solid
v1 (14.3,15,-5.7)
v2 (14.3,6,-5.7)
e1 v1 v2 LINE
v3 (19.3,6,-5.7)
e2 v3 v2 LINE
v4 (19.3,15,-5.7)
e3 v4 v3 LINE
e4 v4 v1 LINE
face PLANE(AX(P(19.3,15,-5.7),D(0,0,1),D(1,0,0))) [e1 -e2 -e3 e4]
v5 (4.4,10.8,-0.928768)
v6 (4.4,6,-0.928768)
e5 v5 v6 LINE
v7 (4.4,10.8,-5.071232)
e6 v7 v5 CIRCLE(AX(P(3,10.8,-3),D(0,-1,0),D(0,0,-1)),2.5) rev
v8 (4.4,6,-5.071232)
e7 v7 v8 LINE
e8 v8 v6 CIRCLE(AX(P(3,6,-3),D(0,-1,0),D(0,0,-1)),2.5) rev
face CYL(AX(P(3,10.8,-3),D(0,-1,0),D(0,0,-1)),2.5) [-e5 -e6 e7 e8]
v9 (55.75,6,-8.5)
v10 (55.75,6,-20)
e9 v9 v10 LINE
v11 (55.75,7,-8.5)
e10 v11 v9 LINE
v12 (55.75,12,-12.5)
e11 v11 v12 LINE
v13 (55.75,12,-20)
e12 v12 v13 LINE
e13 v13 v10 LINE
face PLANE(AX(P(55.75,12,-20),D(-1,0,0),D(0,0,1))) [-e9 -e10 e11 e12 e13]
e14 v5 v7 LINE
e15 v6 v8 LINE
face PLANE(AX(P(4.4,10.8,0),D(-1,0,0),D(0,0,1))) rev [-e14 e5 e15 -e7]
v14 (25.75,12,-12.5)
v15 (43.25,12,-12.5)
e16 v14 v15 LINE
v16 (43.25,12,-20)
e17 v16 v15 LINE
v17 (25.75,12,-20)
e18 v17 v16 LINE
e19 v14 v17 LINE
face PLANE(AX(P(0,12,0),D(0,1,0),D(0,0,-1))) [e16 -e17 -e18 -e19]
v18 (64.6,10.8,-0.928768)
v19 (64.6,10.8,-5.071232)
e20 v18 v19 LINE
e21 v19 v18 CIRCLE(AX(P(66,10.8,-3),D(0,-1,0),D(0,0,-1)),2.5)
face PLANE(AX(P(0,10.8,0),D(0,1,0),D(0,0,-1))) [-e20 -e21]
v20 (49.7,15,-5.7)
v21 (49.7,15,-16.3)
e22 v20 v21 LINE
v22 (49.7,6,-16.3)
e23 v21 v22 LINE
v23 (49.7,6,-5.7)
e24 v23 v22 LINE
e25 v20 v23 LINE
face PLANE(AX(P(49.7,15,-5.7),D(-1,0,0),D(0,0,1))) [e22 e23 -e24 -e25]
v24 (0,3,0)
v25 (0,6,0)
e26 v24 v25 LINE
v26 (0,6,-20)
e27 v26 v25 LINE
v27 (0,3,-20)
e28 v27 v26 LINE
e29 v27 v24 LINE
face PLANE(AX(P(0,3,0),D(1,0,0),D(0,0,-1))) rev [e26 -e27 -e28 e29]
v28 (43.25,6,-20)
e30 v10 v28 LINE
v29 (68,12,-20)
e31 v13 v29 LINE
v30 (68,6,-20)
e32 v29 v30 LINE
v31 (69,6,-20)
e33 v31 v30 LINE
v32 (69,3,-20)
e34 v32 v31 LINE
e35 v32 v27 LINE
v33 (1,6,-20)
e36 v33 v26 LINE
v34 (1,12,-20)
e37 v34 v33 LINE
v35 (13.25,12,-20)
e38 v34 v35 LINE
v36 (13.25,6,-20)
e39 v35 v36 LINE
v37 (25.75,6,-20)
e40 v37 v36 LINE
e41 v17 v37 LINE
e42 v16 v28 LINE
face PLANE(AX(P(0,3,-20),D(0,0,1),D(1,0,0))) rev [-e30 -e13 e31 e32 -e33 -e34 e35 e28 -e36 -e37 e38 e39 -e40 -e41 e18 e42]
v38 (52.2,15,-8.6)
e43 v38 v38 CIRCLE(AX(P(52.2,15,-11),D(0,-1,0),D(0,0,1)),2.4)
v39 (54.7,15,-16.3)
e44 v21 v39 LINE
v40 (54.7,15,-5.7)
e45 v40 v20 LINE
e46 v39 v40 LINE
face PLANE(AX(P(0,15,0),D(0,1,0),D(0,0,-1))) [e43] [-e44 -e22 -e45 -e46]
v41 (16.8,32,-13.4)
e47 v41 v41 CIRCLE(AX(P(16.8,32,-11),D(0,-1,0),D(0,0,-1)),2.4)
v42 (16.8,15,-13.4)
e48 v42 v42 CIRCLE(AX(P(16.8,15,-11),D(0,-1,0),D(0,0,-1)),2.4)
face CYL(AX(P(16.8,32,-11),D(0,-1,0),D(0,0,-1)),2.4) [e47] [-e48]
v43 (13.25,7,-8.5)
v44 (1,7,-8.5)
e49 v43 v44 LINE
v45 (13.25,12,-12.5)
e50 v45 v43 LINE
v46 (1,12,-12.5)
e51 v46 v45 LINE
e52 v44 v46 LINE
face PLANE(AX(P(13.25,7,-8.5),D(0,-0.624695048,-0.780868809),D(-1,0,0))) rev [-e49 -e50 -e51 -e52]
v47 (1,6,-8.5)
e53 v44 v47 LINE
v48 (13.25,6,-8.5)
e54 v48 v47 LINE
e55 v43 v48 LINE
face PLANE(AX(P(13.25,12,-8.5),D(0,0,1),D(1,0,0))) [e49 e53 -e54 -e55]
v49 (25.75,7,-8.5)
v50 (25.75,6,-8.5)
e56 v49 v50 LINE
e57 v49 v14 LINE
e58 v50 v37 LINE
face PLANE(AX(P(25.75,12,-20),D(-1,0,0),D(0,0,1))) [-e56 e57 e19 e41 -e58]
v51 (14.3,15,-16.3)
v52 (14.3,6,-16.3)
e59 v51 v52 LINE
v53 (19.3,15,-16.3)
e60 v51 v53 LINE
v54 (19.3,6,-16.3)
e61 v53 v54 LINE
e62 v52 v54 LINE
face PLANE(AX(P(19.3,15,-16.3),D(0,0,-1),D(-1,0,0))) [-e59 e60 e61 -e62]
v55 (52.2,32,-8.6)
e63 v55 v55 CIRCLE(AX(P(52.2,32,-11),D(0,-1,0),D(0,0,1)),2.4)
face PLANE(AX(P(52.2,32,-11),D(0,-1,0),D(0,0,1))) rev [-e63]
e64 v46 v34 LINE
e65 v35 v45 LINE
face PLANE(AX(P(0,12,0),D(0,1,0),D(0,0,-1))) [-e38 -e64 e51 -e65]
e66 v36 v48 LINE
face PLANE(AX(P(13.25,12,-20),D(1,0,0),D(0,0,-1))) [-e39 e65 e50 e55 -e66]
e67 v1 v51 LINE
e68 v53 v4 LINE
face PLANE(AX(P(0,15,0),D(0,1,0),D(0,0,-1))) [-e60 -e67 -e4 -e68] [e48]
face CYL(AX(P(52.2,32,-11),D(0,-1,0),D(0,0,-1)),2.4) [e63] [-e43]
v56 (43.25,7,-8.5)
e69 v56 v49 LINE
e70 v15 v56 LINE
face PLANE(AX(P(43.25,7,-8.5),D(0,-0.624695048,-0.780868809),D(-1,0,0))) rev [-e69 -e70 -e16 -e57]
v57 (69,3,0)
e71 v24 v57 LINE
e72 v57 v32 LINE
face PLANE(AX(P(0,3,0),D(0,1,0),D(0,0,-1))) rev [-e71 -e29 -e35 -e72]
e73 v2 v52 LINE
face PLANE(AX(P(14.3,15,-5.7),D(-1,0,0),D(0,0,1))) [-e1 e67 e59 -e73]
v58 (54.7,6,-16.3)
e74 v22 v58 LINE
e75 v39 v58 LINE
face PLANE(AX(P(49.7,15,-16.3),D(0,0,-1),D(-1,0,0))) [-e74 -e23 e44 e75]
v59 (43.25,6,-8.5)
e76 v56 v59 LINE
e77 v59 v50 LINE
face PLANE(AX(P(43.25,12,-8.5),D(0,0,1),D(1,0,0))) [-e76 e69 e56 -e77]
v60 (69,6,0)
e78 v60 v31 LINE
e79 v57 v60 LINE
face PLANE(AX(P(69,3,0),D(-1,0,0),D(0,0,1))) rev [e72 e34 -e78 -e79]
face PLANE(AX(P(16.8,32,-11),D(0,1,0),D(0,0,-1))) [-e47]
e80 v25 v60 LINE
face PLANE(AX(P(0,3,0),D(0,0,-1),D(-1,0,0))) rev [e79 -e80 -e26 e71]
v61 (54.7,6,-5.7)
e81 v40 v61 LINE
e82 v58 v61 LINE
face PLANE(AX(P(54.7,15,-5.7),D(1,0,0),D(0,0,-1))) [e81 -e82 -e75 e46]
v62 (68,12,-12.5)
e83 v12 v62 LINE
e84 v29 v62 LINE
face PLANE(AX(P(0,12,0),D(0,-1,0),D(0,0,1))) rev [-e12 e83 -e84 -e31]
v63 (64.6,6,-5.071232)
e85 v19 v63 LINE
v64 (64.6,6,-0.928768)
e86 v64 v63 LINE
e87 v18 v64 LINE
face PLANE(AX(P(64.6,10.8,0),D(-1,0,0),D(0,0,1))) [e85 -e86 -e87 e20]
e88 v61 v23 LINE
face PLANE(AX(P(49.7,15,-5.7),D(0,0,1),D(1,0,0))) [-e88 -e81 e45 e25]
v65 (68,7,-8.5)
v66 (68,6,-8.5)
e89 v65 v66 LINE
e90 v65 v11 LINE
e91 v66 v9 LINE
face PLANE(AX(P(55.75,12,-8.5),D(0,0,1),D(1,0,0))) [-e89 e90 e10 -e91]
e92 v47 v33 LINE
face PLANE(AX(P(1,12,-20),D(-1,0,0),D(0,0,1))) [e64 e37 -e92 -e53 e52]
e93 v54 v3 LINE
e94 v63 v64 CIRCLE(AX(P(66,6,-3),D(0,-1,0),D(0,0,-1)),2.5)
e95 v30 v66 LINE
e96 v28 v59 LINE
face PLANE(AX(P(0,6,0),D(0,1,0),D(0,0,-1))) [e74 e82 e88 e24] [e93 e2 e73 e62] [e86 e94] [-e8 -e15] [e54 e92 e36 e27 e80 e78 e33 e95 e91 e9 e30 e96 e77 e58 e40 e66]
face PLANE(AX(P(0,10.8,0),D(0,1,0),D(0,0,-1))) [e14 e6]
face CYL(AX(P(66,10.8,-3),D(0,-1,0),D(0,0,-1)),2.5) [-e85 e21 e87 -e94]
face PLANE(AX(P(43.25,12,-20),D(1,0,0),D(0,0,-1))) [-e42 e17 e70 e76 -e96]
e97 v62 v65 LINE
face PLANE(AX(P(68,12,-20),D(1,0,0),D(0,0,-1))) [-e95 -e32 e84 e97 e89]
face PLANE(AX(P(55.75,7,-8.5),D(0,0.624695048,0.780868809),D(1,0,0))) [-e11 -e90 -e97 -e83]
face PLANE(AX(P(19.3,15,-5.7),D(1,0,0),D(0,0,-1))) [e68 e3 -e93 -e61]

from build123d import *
from OCP.BRepFilletAPI import BRepFilletAPI_MakeChamfer

# Parameters (mm, degrees)
SKETCH_1_W             = 69
SKETCH_1_H             = 20
EXTRUDE_1_DEPTH        = 3
FILLET_1_R             = 1
SKETCH_3_W             = 12.25
SKETCH_3_H             = 11.5
SKETCH_3_W_2           = 17.5
EXTRUDE_2_DEPTH        = 6
SKETCH_4_W             = 5
SKETCH_4_H             = 10.6
EXTRUDE_3_DEPTH        = 9
SKETCH_5_R             = 2.4
EXTRUDE_4_DEPTH        = 17
CHAMFER_1_SIZE         = 4
CHAMFER_1_SIZE2        = 5
EXTRUDE_5_DEPTH        = 4.8
MIRROR_START           = 3
MIRROR_1_OUTLINE_W     = 69
MIRROR_1_OUTLINE_H     = 20
MIRROR_1_DEPTH         = 3
MIRROR_START_2         = 6
MIRROR_1_2_OUTLINE_W   = 5
MIRROR_1_2_OUTLINE_H   = 10.6
MIRROR_1_2_DEPTH       = 9
MIRROR_START_3         = 15
MIRROR_1_3_OUTLINE_R   = 2.4
MIRROR_1_3_DEPTH       = 17
MIRROR_1_4_OUTLINE_W   = 12.25
MIRROR_1_4_OUTLINE_H   = 11.5
MIRROR_1_4_OUTLINE_W_2 = 17.5
MIRROR_1_4_DEPTH       = 1
MIRROR_START_4         = 6.49884
MIRROR_1_5_DEPTH       = 4.30116
MIRROR_START_5         = 25.75
MIRROR_1_6_DEPTH       = 17.5
MIRROR_START_6         = 1
MIRROR_1_7_DEPTH       = 12.25
MIRROR_START_7         = 55.75
MIRROR_1_8_DEPTH       = 12.25
SKETCH_7_W             = 69
SKETCH_7_H             = 20
CUT_EXTRUDE_1_DEPTH    = 78.472575793


with BuildPart() as part:
    # ｽｹｯﾁ1 → ﾎﾞｽ - 押し出し1 (new body)
    with BuildSketch(Plane(origin=(0, 0, 0), x_dir=(1, 0, 0), z_dir=(0, 1, 0))):
        with Locations((34.5, 10)):
            Rectangle(SKETCH_1_W, SKETCH_1_H)
    extrude(amount=EXTRUDE_1_DEPTH)

    # ﾌｨﾚｯﾄ1
    fillet_1_edges = [part.edges().sort_by_distance(p)[0] for p in [
        (0, 1.5, -20),
        (69, 1.5, -20),
        (69, 1.5, 0),
        (0, 1.5, 0),
    ]]
    fillet(fillet_1_edges, radius=FILLET_1_R)

    # ｽｹｯﾁ3 → ﾎﾞｽ - 押し出し2 (add)
    with BuildSketch(Plane.XZ):
        with Locations((7.125, -14.25)):
            Rectangle(SKETCH_3_W, SKETCH_3_H)
        with Locations((34.5, -14.25)):
            Rectangle(SKETCH_3_W_2, SKETCH_3_H)
        with Locations((61.875, -14.25)):
            Rectangle(SKETCH_3_W, SKETCH_3_H)
    extrude(amount=EXTRUDE_2_DEPTH)

    # ｽｹｯﾁ4 → ﾎﾞｽ - 押し出し3 (add)
    with BuildSketch(Plane.XZ):
        with Locations((52.2, -11)):
            Rectangle(SKETCH_4_W, SKETCH_4_H)
        with Locations((16.8, -11)):
            Rectangle(SKETCH_4_W, SKETCH_4_H)
    extrude(amount=EXTRUDE_3_DEPTH)

    # ｽｹｯﾁ5 → ﾎﾞｽ - 押し出し4 (add)
    with BuildSketch(Plane.XZ.offset(9)):
        with Locations(Location((16.8, -11, 0), (0, 0, 270))):
            Circle(SKETCH_5_R)
        with Locations(Location((52.2, -11, 0), (0, 0, 90))):
            Circle(SKETCH_5_R)
    extrude(amount=EXTRUDE_4_DEPTH)

    # 面取り1: one chamfer whose edges measure the first distance from different faces: ONE call of the kernel's chamfer builder (chamfer() names one face for all edges)
    chamfer_1_edges_1 = [part.edges().sort_by_distance(p)[0] for p in [
        (7.125, -6, -8.5),
    ]]
    chamfer_1_side_1 = [part.faces().sort_by_distance(p)[0] for p in [
        (7.125, -3, -8.5),
    ]]
    chamfer_1_edges_2 = [part.edges().sort_by_distance(p)[0] for p in [
        (34.5, -6, -8.5),
    ]]
    chamfer_1_side_2 = [part.faces().sort_by_distance(p)[0] for p in [
        (34.5, -3, -8.5),
    ]]
    chamfer_1_edges_3 = [part.edges().sort_by_distance(p)[0] for p in [
        (61.875, -6, -8.5),
    ]]
    chamfer_1_side_3 = [part.faces().sort_by_distance(p)[0] for p in [
        (61.875, -3, -8.5),
    ]]
    chamfer_1 = BRepFilletAPI_MakeChamfer(part.part.solid().wrapped)
    for e in chamfer_1_edges_1:
        chamfer_1.Add(CHAMFER_1_SIZE, CHAMFER_1_SIZE2, e.wrapped, chamfer_1_side_1[0].wrapped)  # the first distance lies on this face
    for e in chamfer_1_edges_2:
        chamfer_1.Add(CHAMFER_1_SIZE, CHAMFER_1_SIZE2, e.wrapped, chamfer_1_side_2[0].wrapped)  # the first distance lies on this face
    for e in chamfer_1_edges_3:
        chamfer_1.Add(CHAMFER_1_SIZE, CHAMFER_1_SIZE2, e.wrapped, chamfer_1_side_3[0].wrapped)  # the first distance lies on this face
    add(Compound.cast(chamfer_1.Shape()), mode=Mode.REPLACE)

    # ｽｹｯﾁ6 → ﾎﾞｽ - 押し出し5 (add)
    with BuildSketch(Plane.XZ):
        with BuildLine():
            Line((4.4, -5.071231518), (4.4, -0.928768482))
            ThreePointArc((4.4, -0.928768482), (0.5, -3), (4.4, -5.071231518))
        make_face()
        with BuildLine():
            ThreePointArc((68.5, -3), (67.17260394, -0.792059783), (64.6, -0.928768482))
            Line((64.6, -0.928768482), (64.6, -5.071231518))
            ThreePointArc((64.6, -5.071231518), (67.17260394, -5.207940217), (68.5, -3))
        make_face()
    extrude(amount=EXTRUDE_5_DEPTH)

    # ﾐﾗｰ1: read off the stored shape, not the designer's step
    # ﾐﾗｰ1 outline → ﾐﾗｰ1 (add)
    with BuildSketch(Plane(origin=(0, 0, 0), x_dir=(1, 0, 0), z_dir=(0, 1, 0)).offset(MIRROR_START)):
        with Locations((34.5, 10)):
            Rectangle(MIRROR_1_OUTLINE_W, MIRROR_1_OUTLINE_H)
    extrude(amount=MIRROR_1_DEPTH)

    # Mirror 1 2 outline → Mirror 1 2 (add)
    with BuildSketch(Plane(origin=(0, 0, 0), x_dir=(1, 0, 0), z_dir=(0, 1, 0)).offset(MIRROR_START_2)):
        with Locations((52.2, 11)):
            Rectangle(MIRROR_1_2_OUTLINE_W, MIRROR_1_2_OUTLINE_H)
        with Locations((16.8, 11)):
            Rectangle(MIRROR_1_2_OUTLINE_W, MIRROR_1_2_OUTLINE_H)
    extrude(amount=MIRROR_1_2_DEPTH)

    # Mirror 1 3 outline → Mirror 1 3 (add)
    with BuildSketch(Plane(origin=(0, 0, 0), x_dir=(1, 0, 0), z_dir=(0, 1, 0)).offset(MIRROR_START_3)):
        with Locations((16.8, 11)):
            Circle(MIRROR_1_3_OUTLINE_R)
        with Locations((52.2, 11)):
            Circle(MIRROR_1_3_OUTLINE_R)
    extrude(amount=MIRROR_1_3_DEPTH)

    # Mirror 1 4 outline → Mirror 1 4 (add)
    with BuildSketch(Plane(origin=(0, 0, 0), x_dir=(1, 0, 0), z_dir=(0, 1, 0)).offset(MIRROR_START_2)):
        with Locations((7.125, 14.25)):
            Rectangle(MIRROR_1_4_OUTLINE_W, MIRROR_1_4_OUTLINE_H)
        with Locations((61.875, 14.25)):
            Rectangle(MIRROR_1_4_OUTLINE_W, MIRROR_1_4_OUTLINE_H)
        with Locations((34.5, 14.25)):
            Rectangle(MIRROR_1_4_OUTLINE_W_2, MIRROR_1_4_OUTLINE_H)
        with BuildLine():
            ThreePointArc((4.4, 5.071231518), (0.5, 3), (4.4, 0.928768482))
            Line((4.4, 0.928768482), (4.4, 5.071231518))
        make_face()
        with BuildLine():
            ThreePointArc((64.6, 0.928768482), (68.5, 3), (64.6, 5.071231518))
            Line((64.6, 5.071231518), (64.6, 0.928768482))
        make_face()
    extrude(amount=MIRROR_1_4_DEPTH)

    # Mirror 1 5 outline → Mirror 1 5 (add)
    with BuildSketch(Plane(origin=(0, 0, 0), x_dir=(1, 0, 0), z_dir=(0, 1, 0)).offset(MIRROR_START_4)):
        with BuildLine():
            ThreePointArc((4.4, 5.071231518), (0.5, 3), (4.4, 0.928768482))
            Line((4.4, 0.928768482), (4.4, 5.071231518))
        make_face()
        with BuildLine():
            ThreePointArc((64.6, 0.928768482), (68.5, 3), (64.6, 5.071231518))
            Line((64.6, 5.071231518), (64.6, 0.928768482))
        make_face()
    extrude(amount=MIRROR_1_5_DEPTH)

    # Mirror 1 6 outline → Mirror 1 6 (add)
    with BuildSketch(Plane.YZ.offset(MIRROR_START_5)):
        Polygon((7, -20), (12, -20), (12, -12.5), (7, -8.5), align=None)
    extrude(amount=MIRROR_1_6_DEPTH)

    # Mirror 1 7 outline → Mirror 1 7 (add)
    with BuildSketch(Plane.YZ.offset(MIRROR_START_6)):
        Polygon((7, -20), (12, -20), (12, -12.5), (7, -8.5), align=None)
    extrude(amount=MIRROR_1_7_DEPTH)

    # Mirror 1 8 outline → Mirror 1 8 (add)
    with BuildSketch(Plane.YZ.offset(MIRROR_START_7)):
        Polygon((7, -20), (12, -20), (12, -12.5), (7, -8.5), align=None)
    extrude(amount=MIRROR_1_8_DEPTH)

    # ｽｹｯﾁ7 → ｶｯﾄ - 押し出し1 (cut, through all)
    with BuildSketch(Plane.XZ.offset(-3)):
        with Locations((34.5, -10)):
            Rectangle(SKETCH_7_W, SKETCH_7_H)
    extrude(amount=CUT_EXTRUDE_1_DEPTH, mode=Mode.SUBTRACT)


solid = part.part
